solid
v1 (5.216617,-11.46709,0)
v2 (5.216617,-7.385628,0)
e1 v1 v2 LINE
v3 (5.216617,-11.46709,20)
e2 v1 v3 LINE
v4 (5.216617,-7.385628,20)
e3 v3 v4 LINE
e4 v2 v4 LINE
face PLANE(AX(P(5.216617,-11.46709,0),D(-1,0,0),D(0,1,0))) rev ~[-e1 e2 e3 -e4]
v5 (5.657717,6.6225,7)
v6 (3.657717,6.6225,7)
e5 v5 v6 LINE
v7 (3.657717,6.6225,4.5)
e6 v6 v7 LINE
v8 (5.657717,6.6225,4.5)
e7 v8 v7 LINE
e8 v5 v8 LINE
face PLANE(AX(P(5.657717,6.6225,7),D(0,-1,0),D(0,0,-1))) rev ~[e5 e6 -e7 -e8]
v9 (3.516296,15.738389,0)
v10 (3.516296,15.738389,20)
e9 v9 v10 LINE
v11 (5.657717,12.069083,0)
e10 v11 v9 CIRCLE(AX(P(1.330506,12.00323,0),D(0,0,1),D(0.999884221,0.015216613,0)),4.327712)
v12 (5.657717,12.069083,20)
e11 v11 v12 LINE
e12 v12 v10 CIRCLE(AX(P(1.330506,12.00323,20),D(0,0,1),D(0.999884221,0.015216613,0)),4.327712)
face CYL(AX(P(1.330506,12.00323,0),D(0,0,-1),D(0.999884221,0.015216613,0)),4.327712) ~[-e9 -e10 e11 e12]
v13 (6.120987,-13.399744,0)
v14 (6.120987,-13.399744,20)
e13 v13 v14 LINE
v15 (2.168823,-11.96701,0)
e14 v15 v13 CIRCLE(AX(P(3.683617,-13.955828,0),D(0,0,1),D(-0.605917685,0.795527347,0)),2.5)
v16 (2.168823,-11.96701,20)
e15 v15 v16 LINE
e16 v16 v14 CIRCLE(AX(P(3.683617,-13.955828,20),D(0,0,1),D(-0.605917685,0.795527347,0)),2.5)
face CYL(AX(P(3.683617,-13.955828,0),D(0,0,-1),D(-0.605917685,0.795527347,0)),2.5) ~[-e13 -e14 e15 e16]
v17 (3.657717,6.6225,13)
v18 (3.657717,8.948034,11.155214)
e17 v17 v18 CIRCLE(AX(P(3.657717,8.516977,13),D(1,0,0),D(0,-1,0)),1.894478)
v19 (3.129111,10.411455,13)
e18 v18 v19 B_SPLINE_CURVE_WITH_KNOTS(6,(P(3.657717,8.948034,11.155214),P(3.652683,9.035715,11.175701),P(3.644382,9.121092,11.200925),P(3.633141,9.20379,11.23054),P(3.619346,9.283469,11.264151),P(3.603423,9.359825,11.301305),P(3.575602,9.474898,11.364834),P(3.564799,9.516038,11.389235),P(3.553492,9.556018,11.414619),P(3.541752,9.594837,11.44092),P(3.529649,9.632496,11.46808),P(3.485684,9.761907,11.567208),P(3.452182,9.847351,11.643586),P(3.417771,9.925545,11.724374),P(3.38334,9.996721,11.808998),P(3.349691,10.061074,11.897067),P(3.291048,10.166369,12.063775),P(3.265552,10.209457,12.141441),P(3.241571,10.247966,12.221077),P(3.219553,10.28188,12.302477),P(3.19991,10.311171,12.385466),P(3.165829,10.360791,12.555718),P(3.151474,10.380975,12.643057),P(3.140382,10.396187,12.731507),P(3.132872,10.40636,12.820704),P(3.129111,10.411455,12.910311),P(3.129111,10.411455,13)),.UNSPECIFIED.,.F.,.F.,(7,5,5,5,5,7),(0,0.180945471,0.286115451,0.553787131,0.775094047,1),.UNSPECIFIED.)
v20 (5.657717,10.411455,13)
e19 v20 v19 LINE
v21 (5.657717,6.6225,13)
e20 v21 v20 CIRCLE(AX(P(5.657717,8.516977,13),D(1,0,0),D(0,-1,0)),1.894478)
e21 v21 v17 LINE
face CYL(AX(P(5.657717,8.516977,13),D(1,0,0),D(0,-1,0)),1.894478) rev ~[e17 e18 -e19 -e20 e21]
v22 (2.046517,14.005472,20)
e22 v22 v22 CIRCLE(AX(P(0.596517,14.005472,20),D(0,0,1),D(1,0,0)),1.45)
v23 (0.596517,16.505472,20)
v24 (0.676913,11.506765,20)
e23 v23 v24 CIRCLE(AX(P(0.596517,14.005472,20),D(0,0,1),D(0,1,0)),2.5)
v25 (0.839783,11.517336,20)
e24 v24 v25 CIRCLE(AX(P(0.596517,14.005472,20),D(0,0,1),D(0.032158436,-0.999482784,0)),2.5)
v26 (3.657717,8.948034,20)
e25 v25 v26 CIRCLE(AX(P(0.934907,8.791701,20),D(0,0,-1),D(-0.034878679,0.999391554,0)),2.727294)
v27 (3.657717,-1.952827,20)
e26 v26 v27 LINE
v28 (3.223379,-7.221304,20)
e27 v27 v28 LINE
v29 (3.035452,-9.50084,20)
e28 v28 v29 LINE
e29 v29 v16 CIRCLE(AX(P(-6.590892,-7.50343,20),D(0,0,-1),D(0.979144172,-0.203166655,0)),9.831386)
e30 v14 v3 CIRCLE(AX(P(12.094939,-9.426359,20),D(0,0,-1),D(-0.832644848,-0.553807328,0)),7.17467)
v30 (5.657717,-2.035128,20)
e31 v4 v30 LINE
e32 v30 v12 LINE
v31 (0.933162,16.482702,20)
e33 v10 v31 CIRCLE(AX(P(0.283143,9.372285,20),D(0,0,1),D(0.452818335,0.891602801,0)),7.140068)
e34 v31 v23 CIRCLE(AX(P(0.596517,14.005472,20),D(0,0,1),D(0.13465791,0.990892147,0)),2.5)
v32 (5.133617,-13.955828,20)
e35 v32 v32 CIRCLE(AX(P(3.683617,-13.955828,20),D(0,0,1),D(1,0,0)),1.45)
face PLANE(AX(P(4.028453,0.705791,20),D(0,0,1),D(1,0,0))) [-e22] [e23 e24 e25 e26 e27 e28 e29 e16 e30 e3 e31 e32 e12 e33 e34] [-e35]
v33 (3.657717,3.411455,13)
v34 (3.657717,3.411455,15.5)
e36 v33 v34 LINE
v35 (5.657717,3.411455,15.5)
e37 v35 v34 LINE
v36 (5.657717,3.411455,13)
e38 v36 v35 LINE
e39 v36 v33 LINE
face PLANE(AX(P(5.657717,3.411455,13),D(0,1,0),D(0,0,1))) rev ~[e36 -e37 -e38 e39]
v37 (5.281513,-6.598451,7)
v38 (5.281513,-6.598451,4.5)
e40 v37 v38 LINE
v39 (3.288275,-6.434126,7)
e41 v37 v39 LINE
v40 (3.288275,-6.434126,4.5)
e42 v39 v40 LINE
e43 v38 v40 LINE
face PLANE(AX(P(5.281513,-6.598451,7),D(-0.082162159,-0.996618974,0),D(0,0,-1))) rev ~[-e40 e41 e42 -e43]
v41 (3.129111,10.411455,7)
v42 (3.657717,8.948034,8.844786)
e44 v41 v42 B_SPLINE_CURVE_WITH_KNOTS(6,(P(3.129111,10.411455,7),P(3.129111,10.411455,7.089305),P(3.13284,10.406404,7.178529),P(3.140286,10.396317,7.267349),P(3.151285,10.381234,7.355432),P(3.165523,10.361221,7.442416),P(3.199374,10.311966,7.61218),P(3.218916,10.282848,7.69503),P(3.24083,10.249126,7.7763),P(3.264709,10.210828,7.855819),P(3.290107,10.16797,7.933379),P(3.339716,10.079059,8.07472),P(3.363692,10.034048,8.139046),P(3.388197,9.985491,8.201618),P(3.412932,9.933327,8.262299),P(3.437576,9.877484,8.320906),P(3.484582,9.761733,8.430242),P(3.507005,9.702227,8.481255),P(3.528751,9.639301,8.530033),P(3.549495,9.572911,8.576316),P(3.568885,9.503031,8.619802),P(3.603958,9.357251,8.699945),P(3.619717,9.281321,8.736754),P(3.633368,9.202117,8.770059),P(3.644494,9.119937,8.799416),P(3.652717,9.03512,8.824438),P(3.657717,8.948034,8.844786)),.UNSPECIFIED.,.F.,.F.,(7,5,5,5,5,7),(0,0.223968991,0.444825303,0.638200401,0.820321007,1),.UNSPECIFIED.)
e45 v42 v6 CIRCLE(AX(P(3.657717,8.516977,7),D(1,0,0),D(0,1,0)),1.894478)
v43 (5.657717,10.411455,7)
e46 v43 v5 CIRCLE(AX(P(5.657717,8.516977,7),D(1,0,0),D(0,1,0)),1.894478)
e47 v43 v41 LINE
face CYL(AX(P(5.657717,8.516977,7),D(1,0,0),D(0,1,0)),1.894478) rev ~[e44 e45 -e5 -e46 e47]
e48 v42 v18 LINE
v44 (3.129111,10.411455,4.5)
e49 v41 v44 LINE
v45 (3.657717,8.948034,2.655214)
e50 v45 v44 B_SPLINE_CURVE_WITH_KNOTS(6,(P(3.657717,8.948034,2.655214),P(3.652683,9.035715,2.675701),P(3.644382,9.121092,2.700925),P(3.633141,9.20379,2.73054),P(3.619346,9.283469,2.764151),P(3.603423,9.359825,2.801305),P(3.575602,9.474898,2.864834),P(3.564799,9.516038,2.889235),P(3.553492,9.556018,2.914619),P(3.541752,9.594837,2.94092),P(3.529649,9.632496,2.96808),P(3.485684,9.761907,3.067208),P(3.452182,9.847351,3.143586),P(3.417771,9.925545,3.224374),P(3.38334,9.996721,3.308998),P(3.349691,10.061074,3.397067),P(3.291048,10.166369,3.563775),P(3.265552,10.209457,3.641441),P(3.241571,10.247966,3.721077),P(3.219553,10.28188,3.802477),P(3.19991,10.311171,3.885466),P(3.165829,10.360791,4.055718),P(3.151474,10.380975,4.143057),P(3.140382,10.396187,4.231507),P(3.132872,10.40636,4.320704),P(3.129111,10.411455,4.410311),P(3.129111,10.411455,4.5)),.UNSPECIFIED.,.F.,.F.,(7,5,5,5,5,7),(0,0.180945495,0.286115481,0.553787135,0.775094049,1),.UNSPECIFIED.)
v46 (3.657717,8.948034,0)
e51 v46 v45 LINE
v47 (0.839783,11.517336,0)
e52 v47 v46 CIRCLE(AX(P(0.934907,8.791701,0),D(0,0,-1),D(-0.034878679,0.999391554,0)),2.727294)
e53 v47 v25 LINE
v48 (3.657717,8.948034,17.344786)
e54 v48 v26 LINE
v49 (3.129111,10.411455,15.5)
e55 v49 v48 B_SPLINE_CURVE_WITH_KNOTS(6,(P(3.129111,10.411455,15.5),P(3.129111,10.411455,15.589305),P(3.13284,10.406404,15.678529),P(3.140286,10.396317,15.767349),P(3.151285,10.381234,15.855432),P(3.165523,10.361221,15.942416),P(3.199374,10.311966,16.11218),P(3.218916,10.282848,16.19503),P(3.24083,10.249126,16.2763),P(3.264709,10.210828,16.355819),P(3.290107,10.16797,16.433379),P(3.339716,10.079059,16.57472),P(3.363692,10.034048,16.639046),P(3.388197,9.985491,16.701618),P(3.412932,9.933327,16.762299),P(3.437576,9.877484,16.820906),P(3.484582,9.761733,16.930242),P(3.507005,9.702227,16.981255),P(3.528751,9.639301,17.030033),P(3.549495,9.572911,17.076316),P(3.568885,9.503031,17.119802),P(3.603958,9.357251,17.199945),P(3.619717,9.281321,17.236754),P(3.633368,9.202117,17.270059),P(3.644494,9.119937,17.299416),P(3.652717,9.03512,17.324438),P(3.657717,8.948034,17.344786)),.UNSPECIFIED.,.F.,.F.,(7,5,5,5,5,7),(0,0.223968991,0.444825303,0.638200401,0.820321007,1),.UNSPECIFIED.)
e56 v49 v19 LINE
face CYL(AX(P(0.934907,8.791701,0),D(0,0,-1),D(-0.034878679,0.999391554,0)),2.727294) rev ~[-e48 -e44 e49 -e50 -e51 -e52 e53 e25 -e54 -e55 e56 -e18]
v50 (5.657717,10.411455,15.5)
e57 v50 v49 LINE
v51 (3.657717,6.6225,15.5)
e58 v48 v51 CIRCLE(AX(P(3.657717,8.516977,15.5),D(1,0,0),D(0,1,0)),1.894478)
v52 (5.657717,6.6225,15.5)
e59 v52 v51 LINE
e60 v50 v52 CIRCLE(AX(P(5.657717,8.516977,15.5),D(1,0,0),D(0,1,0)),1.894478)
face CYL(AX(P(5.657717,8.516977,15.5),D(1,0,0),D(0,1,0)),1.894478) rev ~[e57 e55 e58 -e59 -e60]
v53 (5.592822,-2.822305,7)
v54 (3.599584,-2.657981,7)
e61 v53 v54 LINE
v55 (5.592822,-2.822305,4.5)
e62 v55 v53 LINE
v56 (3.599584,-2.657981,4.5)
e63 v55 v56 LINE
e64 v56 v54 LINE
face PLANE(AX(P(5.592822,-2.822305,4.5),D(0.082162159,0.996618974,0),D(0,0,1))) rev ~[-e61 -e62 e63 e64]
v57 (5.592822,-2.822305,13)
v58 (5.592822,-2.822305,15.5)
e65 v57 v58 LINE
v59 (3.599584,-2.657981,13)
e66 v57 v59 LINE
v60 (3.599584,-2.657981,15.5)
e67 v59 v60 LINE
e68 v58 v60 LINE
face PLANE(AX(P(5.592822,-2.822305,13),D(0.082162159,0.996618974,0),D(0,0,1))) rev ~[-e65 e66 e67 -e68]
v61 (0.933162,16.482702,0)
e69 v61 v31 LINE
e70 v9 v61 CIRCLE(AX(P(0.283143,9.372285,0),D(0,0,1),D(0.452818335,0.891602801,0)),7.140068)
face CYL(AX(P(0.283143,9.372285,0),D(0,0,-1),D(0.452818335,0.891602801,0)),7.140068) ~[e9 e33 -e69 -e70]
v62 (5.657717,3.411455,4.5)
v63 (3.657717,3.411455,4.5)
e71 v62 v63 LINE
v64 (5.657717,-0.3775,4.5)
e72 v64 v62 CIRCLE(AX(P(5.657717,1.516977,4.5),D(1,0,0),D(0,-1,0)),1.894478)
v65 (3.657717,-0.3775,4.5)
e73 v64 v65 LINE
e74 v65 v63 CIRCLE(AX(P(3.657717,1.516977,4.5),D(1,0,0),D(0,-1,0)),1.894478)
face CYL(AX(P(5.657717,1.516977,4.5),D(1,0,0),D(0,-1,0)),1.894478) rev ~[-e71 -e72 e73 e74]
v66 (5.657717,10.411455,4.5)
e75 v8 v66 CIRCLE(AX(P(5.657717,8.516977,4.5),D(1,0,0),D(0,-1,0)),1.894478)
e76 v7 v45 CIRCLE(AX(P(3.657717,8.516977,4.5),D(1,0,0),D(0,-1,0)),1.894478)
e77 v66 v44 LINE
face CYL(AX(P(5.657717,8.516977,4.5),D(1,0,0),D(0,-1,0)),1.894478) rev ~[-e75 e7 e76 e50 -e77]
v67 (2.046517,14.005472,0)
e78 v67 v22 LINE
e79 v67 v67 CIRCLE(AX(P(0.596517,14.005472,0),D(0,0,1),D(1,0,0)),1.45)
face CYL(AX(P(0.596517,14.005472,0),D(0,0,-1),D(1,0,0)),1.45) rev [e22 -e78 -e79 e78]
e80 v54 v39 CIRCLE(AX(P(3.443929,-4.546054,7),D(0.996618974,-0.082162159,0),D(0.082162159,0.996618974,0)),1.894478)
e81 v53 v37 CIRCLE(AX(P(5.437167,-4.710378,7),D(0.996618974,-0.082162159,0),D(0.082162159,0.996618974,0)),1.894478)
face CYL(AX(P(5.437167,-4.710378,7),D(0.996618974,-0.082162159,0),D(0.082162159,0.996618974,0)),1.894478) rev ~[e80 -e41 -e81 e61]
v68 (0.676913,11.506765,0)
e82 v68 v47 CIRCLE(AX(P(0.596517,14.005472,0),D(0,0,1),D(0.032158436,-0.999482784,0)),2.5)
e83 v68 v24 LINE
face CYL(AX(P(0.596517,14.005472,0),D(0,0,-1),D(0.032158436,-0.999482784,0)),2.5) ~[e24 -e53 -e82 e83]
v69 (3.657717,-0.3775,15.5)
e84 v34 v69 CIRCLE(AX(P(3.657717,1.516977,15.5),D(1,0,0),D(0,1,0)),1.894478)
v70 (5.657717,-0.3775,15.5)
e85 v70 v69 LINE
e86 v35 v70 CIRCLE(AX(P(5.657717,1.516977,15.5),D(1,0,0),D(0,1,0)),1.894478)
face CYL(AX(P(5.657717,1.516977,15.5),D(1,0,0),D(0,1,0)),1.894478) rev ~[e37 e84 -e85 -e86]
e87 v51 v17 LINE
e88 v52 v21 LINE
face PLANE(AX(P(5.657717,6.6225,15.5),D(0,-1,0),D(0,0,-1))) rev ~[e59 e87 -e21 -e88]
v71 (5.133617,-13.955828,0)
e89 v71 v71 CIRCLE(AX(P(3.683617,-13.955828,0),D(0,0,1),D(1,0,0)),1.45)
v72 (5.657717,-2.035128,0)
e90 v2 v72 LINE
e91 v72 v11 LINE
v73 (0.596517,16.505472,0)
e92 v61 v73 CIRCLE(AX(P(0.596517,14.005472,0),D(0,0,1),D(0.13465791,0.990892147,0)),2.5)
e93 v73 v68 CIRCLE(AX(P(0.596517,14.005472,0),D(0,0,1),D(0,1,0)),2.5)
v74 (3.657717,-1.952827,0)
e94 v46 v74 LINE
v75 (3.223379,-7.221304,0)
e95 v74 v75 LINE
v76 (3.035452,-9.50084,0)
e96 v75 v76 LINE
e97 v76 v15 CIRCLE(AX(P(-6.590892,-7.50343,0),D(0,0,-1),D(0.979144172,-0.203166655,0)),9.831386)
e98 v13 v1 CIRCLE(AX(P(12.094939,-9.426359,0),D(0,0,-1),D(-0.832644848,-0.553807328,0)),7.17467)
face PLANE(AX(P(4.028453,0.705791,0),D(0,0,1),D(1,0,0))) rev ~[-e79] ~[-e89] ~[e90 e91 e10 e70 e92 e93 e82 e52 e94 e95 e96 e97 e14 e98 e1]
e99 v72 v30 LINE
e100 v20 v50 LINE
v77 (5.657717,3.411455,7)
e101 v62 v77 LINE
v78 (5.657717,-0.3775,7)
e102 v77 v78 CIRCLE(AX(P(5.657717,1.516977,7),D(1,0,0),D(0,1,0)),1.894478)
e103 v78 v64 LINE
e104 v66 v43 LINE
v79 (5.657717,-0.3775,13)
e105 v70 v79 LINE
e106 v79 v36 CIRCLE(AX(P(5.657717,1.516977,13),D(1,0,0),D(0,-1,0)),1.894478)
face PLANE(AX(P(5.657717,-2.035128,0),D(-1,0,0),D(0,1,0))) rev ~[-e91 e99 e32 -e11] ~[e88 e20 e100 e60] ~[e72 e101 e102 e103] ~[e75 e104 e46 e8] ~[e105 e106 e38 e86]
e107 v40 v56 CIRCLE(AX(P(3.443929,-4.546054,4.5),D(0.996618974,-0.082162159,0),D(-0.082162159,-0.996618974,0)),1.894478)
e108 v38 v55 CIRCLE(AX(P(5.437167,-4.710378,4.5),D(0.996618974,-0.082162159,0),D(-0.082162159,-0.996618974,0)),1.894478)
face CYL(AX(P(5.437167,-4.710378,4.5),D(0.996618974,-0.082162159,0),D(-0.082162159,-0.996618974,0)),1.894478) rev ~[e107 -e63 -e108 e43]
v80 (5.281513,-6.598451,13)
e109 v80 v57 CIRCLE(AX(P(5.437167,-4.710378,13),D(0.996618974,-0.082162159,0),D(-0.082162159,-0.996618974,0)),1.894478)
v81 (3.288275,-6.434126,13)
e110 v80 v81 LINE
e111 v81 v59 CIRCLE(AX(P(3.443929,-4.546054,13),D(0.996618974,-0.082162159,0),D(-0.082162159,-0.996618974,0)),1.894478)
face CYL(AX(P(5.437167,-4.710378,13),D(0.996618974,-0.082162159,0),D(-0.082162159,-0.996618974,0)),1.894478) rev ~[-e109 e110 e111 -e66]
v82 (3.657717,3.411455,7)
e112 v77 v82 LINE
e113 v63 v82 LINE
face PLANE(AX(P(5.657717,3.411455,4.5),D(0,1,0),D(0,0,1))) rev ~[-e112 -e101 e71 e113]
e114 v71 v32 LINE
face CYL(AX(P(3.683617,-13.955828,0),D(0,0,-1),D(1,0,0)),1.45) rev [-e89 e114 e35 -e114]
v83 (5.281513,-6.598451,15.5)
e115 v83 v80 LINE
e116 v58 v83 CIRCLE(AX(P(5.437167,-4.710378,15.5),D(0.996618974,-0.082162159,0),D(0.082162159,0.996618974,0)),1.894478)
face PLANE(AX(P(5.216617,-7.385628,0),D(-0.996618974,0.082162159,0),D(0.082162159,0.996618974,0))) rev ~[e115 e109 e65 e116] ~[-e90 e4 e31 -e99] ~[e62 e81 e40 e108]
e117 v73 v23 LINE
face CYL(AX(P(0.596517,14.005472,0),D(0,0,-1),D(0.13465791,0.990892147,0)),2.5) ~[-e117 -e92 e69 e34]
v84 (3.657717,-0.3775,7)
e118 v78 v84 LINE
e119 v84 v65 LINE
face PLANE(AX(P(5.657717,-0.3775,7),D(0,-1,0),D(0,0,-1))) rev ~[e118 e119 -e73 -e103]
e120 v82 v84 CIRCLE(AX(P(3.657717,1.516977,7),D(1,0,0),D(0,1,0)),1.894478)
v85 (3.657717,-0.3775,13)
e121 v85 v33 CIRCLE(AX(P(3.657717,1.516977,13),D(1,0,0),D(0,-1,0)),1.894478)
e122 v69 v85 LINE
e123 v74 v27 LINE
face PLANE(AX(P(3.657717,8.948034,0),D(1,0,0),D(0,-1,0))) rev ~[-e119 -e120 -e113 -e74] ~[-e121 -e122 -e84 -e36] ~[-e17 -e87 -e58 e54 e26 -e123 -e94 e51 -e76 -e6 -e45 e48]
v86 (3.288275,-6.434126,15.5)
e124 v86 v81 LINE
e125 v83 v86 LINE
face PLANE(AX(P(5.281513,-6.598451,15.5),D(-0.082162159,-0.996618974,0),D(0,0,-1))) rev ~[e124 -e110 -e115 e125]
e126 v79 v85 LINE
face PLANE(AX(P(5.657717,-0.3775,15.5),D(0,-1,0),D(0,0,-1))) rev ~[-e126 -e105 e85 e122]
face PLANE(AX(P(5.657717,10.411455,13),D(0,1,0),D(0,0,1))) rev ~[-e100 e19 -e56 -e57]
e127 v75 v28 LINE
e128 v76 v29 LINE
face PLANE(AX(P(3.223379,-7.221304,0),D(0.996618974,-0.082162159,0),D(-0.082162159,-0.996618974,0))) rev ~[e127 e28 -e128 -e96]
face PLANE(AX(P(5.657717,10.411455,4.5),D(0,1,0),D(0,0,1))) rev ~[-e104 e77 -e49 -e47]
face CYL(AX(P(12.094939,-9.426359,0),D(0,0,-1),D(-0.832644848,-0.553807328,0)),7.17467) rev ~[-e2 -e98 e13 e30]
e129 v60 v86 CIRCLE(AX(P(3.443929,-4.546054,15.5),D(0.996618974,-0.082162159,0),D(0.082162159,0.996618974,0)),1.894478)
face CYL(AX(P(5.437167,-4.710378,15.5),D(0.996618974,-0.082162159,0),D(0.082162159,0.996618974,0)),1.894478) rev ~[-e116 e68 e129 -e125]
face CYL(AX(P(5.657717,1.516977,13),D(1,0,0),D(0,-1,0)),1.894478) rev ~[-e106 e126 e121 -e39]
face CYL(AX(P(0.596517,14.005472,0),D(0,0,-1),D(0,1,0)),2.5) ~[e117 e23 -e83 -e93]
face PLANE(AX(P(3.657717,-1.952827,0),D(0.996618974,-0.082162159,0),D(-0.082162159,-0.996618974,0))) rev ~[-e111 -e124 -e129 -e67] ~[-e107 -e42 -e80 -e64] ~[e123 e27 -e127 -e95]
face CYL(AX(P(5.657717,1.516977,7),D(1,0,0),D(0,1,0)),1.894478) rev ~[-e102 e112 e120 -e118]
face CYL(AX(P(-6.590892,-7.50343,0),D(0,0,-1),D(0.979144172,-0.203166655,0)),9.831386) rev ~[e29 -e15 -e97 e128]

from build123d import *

# Parameters (mm, degrees)
F0_R     = 1.45
F1_DEPTH = 20
F3_DEPTH = 25
F5_DEPTH = 25


# Not quite as in the source:
# - a feature names something its author has since deleted; it is built from what else it names


with BuildPart() as f1:
    # F0 (on Top) → F1 (new body)
    with BuildSketch(Plane.XY):
        with BuildLine():
            Line((5.2166173299, -7.3856279958), (5.6577173299, -2.0351279958))
            Line((5.6577173299, -2.0351279958), (5.6577173299, 12.0690828189))
            ThreePointArc((5.6577173299, 12.0690828189), (5.068252548, 14.1845927754), (3.5162961604, 15.7383889255))
            ThreePointArc((3.5162961604, 15.7383889255), (2.260074285, 16.2332107279), (0.9331621041, 16.4827023722))
            ThreePointArc((0.9331621041, 16.4827023722), (2.4795483886, 15.6499153849), (3.0965173299, 14.0054720042))
            ThreePointArc((3.0965173299, 14.0054720042), (2.4482954337, 12.3259131769), (0.8397830463, 11.5173357959))
            ThreePointArc((0.8397830463, 11.5173357959), (2.7724359809, 10.8070477652), (3.6577173299, 8.9480336756))
            Line((3.6577173299, 8.9480336756), (3.6577173299, -1.9528267058))
            Line((3.6577173299, -1.9528267058), (3.2233793816, -7.2213036786))
            Line((3.2233793816, -7.2213036786), (3.0354523847, -9.5008398307))
            ThreePointArc((3.0354523847, -9.5008398307), (2.6844675314, -10.7628559885), (2.1688231186, -11.9670096287))
            ThreePointArc((2.1688231186, -11.9670096287), (2.8315798002, -16.3061539408), (6.1209868425, -13.3997435963))
            ThreePointArc((6.1209868425, -13.3997435963), (5.5965527788, -12.467225095), (5.2166173299, -11.4670896557))
            Line((5.2166173299, -11.4670896557), (5.2166173299, -7.3856279958))
        make_face()
        with Locations((3.6836173299, -13.9558279958)):
            Circle(F0_R, mode=Mode.SUBTRACT)
        with BuildLine():
            ThreePointArc((0.5965173299, 16.5054720042), (0.7649742372, 16.4960760435), (0.9331621041, 16.4827023722))
            ThreePointArc((0.9331621041, 16.4827023722), (0.7652242949, 16.4997731007), (0.5965173299, 16.5054720042))
        make_face()
        with BuildLine():
            ThreePointArc((3.0965173299, 14.0054720042), (2.4795483886, 15.6499153849), (0.9331621041, 16.4827023722))
            ThreePointArc((0.9331621041, 16.4827023722), (0.7649742372, 16.4960760435), (0.5965173299, 16.5054720042))
            ThreePointArc((0.5965173299, 16.5054720042), (-1.903159389, 13.9652687601), (0.6769134206, 11.5067650449))
            ThreePointArc((0.6769134206, 11.5067650449), (0.7582691412, 11.5132690403), (0.8397830463, 11.5173357959))
            ThreePointArc((0.8397830463, 11.5173357959), (2.4482954337, 12.3259131769), (3.0965173299, 14.0054720042))
        make_face()
        with Locations((0.5965173299, 14.0054720042)):
            Circle(F0_R, mode=Mode.SUBTRACT)
        with BuildLine():
            ThreePointArc((0.6769134206, 11.5067650449), (0.7584345203, 11.5107209498), (0.8397830463, 11.5173357959))
            ThreePointArc((0.8397830463, 11.5173357959), (0.7582691412, 11.5132690403), (0.6769134206, 11.5067650449))
        make_face()
    extrude(amount=F1_DEPTH)

    # F2 (on face) → F3 (cut)
    with BuildSketch(Plane.YZ.offset(5.6577173299)):
        with BuildLine():
            Line((3.4114552828, 13), (3.4114552828, 15.5))
            ThreePointArc((3.4114552828, 15.5), (1.5169774116, 17.3944778712), (-0.3775004597, 15.5))
            Line((-0.3775004597, 15.5), (-0.3775004597, 13))
            ThreePointArc((-0.3775004597, 13), (1.5169774116, 11.1055221288), (3.4114552828, 13))
        make_face()
        with BuildLine():
            Line((6.6224995403, 7), (6.6224995403, 4.5))
            ThreePointArc((6.6224995403, 4.5), (8.5169774116, 2.6055221288), (10.4114552828, 4.5))
            Line((10.4114552828, 4.5), (10.4114552828, 7))
            ThreePointArc((10.4114552828, 7), (8.5169774116, 8.8944778712), (6.6224995403, 7))
        make_face()
        with BuildLine():
            ThreePointArc((10.4114552828, 15.5), (8.5169774116, 17.3944778712), (6.6224995403, 15.5))
            Line((6.6224995403, 15.5), (6.6224995403, 13))
            ThreePointArc((6.6224995403, 13), (8.5169774116, 11.1055221288), (10.4114552828, 13))
            Line((10.4114552828, 13), (10.4114552828, 15.5))
        make_face()
        with BuildLine():
            ThreePointArc((-0.3775004597, 4.5), (1.5169774116, 2.6055221288), (3.4114552828, 4.5))
            Line((3.4114552828, 4.5), (3.4114552828, 7))
            ThreePointArc((3.4114552828, 7), (1.5169774116, 8.8944778712), (-0.3775004597, 7))
            Line((-0.3775004597, 7), (-0.3775004597, 4.5))
        make_face()
    extrude(amount=-F3_DEPTH, mode=Mode.SUBTRACT)

    # F4 (on face) → F5 (cut)
    with BuildSketch(Plane(origin=(5.7861693945, -0.4770169741, 0), x_dir=(0.0821621586, 0.9966189742, 0), z_dir=(0.9966189742, -0.0821621586, 0))):
        with BuildLine():
            ThreePointArc((-2.3532448105, 15.5), (-4.2477226817, 17.3944778712), (-6.142200553, 15.5))
            Line((-6.142200553, 15.5), (-6.142200553, 13))
            ThreePointArc((-6.142200553, 13), (-4.2477226817, 11.1055221288), (-2.3532448105, 13))
            Line((-2.3532448105, 13), (-2.3532448105, 15.5))
        make_face()
        with BuildLine():
            ThreePointArc((-6.142200553, 4.5), (-4.2477226817, 2.6055221288), (-2.3532448105, 4.5))
            Line((-2.3532448105, 4.5), (-2.3532448105, 7))
            ThreePointArc((-2.3532448105, 7), (-4.2477226817, 8.8944778712), (-6.142200553, 7))
            Line((-6.142200553, 7), (-6.142200553, 4.5))
        make_face()
    extrude(amount=-F5_DEPTH, mode=Mode.SUBTRACT)


solid = f1.part
